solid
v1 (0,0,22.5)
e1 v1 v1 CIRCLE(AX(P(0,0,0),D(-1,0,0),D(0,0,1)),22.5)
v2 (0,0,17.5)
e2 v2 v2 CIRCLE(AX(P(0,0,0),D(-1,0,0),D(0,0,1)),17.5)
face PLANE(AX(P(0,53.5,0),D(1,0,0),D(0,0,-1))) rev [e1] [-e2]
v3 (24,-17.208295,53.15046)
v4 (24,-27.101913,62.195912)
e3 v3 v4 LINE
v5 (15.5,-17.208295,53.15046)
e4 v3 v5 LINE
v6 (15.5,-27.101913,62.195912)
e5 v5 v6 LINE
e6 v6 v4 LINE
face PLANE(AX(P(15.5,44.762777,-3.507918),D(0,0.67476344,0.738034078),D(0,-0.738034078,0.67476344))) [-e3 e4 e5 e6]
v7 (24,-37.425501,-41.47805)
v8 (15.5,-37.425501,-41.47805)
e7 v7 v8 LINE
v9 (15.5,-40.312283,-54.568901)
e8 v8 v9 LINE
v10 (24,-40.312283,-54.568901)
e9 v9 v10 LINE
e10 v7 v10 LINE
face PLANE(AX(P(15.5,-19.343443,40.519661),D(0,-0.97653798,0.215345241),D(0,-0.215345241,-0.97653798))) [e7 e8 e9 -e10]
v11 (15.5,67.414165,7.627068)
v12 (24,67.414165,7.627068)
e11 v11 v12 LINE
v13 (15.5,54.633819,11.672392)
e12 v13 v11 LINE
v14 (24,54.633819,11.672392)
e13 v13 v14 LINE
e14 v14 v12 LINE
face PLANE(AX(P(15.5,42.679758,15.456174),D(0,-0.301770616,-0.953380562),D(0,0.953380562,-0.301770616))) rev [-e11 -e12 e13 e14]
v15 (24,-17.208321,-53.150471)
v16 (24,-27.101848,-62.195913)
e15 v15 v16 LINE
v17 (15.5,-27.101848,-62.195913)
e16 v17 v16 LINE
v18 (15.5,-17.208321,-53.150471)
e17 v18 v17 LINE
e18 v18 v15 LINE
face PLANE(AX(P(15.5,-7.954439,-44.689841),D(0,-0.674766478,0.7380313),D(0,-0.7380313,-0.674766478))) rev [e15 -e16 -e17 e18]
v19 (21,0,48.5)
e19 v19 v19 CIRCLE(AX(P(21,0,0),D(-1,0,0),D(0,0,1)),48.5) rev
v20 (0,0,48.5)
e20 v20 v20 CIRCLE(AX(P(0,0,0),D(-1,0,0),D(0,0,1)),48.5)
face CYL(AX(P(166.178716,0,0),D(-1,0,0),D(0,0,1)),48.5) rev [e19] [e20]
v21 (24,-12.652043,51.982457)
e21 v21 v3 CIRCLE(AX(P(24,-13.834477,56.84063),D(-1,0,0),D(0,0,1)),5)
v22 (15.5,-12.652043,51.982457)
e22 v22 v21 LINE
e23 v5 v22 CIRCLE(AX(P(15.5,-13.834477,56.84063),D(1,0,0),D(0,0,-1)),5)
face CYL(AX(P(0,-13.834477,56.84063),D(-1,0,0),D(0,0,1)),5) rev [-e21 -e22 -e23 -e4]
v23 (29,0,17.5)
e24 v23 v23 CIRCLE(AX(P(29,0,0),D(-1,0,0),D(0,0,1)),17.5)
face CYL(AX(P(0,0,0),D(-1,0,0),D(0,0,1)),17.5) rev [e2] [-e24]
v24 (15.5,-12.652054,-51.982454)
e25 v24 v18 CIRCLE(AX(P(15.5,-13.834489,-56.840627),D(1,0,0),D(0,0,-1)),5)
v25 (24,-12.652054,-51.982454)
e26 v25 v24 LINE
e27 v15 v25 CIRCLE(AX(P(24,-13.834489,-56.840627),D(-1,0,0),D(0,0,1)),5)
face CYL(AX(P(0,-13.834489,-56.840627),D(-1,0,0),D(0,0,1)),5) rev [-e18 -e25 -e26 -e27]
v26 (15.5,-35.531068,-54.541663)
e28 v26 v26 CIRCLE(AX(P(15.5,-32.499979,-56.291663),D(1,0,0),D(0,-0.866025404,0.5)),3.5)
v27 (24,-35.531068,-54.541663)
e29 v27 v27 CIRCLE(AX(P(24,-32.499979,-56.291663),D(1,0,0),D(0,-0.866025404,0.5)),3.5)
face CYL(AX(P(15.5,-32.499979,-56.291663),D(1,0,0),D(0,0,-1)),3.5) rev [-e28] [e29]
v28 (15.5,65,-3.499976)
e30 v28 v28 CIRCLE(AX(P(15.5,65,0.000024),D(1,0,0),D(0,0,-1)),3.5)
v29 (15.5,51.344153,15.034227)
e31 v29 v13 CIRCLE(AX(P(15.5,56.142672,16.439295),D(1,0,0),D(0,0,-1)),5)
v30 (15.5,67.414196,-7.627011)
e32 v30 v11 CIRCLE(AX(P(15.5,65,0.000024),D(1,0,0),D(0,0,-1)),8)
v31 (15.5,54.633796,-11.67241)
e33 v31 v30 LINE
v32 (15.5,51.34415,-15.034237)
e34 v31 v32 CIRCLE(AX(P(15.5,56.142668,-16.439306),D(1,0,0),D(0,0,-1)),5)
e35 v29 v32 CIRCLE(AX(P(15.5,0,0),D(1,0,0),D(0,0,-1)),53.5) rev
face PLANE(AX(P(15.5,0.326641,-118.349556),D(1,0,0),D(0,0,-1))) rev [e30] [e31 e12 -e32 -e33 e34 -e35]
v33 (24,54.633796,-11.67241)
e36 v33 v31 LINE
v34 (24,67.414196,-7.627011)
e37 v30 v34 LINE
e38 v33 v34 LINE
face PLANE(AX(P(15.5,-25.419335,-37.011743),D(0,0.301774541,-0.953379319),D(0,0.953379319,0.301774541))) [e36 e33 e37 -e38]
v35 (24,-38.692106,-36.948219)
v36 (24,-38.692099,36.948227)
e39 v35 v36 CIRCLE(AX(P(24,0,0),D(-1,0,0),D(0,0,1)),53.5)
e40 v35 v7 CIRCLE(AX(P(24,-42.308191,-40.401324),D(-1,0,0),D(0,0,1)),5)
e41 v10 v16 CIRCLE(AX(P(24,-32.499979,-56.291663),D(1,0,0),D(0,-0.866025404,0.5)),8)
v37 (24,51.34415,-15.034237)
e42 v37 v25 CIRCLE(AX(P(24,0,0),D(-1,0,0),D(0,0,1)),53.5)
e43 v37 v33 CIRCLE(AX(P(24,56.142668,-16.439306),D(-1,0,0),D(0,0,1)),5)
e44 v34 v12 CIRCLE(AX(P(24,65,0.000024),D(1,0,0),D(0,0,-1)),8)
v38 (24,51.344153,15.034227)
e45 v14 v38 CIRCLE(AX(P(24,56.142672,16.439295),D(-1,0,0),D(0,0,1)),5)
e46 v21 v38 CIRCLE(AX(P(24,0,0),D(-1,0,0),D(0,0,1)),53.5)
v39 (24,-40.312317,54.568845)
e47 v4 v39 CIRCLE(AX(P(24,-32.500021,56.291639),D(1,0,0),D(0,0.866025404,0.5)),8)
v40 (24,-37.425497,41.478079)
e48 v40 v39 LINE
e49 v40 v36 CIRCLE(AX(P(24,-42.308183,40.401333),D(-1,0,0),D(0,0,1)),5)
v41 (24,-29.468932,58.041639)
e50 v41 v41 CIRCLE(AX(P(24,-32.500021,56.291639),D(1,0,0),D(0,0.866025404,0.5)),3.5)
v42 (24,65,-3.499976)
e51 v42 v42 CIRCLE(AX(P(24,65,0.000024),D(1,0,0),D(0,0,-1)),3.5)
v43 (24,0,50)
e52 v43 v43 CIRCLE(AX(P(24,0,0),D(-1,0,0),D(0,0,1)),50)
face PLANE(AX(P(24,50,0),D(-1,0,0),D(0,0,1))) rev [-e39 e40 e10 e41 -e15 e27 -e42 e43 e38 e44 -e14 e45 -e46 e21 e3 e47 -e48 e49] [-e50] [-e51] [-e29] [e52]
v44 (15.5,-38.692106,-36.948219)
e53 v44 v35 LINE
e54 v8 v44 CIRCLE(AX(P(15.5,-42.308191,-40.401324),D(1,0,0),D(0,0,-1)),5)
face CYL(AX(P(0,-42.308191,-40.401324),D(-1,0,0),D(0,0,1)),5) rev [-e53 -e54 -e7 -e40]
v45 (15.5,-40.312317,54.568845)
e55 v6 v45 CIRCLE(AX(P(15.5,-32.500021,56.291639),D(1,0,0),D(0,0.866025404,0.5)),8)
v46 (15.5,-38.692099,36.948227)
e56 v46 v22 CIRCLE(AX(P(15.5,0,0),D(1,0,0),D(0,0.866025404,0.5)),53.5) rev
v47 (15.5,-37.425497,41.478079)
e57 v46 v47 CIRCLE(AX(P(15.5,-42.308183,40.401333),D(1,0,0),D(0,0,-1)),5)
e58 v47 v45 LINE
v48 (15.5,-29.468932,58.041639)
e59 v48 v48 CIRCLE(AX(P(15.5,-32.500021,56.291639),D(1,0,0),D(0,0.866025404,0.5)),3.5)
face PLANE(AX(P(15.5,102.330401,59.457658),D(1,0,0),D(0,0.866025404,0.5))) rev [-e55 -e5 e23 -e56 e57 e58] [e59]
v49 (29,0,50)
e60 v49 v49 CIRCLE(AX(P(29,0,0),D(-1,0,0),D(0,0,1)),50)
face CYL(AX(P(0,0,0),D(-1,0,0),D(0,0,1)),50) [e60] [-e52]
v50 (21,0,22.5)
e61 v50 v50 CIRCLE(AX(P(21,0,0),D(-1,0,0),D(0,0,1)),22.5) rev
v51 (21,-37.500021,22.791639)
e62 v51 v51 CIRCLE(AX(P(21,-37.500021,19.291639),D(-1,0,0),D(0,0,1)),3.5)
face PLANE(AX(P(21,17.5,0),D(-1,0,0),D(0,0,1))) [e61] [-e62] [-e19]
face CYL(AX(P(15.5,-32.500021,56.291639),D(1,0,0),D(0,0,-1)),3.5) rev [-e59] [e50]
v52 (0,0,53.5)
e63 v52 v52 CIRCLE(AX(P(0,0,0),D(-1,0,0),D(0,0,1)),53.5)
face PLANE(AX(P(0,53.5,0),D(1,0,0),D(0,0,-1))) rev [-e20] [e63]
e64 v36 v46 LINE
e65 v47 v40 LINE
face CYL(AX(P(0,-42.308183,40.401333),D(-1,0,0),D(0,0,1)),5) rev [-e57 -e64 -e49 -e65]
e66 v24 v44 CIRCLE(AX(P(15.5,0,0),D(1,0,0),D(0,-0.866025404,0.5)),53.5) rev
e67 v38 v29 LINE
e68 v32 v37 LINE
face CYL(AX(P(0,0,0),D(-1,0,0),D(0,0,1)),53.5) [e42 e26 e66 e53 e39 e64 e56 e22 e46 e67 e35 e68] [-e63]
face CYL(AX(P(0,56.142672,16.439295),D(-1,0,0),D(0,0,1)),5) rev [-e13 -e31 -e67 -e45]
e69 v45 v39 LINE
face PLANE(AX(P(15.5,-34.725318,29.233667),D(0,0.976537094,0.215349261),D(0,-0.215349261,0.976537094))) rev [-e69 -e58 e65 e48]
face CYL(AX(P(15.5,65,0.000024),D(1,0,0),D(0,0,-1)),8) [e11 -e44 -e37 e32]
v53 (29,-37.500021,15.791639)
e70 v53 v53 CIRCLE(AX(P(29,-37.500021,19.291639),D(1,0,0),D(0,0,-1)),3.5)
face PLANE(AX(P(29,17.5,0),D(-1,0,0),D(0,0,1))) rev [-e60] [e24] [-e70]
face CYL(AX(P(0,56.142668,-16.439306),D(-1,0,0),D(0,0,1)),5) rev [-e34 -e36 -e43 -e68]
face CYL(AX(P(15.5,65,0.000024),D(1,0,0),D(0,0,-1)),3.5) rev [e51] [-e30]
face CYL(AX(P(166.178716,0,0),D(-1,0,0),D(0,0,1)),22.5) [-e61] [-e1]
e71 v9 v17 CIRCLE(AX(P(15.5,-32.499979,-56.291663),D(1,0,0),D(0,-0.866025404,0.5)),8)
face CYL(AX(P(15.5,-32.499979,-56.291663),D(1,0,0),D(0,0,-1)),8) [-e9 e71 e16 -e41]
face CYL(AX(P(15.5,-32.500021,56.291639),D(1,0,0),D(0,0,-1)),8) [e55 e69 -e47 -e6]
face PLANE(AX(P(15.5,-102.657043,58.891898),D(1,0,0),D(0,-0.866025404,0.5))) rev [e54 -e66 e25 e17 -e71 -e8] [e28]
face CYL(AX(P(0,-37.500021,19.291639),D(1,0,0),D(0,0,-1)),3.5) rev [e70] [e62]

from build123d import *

# Parameters (mm, degrees)
EXTRUS_O1_START          = -8.5
EXTRUS_O1_OUTLINE_R      = 3.5
EXTRUS_O1_DEPTH          = 8.5
FILETE1_R                = 5
CIRPATTERN1_COUNT        = 3
FILETE1_OF_CIRPATTERN1_R = 5
ESBO_O3_R                = 48.5
ESBO_O3_R_2              = 22.5
CORTE_EXTRUS_O1_DEPTH    = 21
ESBO_O4_R                = 3.5
CORTE_EXTRUS_O2_DEPTH    = 102.505753245


# Read off the part's stored shape, not the designer's step: Extrusão1
with BuildPart() as part:
    # Esboço1 → Revolução1 (revolve)
    with BuildSketch(Plane.XY, mode=Mode.PRIVATE) as revolu_o1_sk:
        Polygon((0, 17.5), (29, 17.5), (29, 50), (24, 50), (24, 53.5), (0, 53.5), align=None)
    revolve(revolu_o1_sk.sketch.rotate(Axis((0, 0, 0), (1, 0, 0)), 90), axis=Axis((0, 0, 0), (1, 0, 0)))

    # Extrusão1 outline → Extrusão1 (add)
    with BuildSketch(Plane(origin=(24, 0, 0), x_dir=(0, 0, -1), z_dir=(1, 0, 0)).offset(EXTRUS_O1_START)):
        with BuildLine():
            Line((-7.627068165, 67.414164927), (-12.499978821, 52.019232304))
            ThreePointArc((-12.499978821, 52.019232304), (1.2458e-05, 53.5), (12.500003048, 52.019226482))
            Line((12.500003048, 52.019226482), (7.627010883, 67.414196325))
            ThreePointArc((7.627010883, 67.414196325), (-4.0138e-05, 73), (-7.627068165, 67.414164927))
        make_face()
        with Locations((-2.3672e-05, 65)):
            Circle(EXTRUS_O1_OUTLINE_R, mode=Mode.SUBTRACT)
    extrus_o1 = extrude(amount=EXTRUS_O1_DEPTH)

    # Filete1
    filete1_edges = [part.edges().sort_by_distance(p)[0] for p in [
        (19.75, 52.019232304, 12.499978821),
        (19.75, 52.019226482, -12.500003048),
    ]]
    fillet(filete1_edges, radius=FILETE1_R)

    # CirPattern1: Extrusão1 ×3 about axis
    cirpattern1_axis = Axis((0, 0, 0), (1, 0, 0))
    for i in range(1, CIRPATTERN1_COUNT):
        add(extrus_o1.rotate(cirpattern1_axis, i * 360 / CIRPATTERN1_COUNT))

    # Filete1 of CirPattern1
    filete1_of_cirpattern1_edges = [part.edges().sort_by_distance(p)[0] for p in [
        (19.75, -36.834915358, 38.79998725),
        (19.75, -15.184293054, 51.299973143),
        (19.75, -15.184316946, -51.299966071),
        (19.75, -36.834933428, -38.799970095),
    ]]
    fillet(filete1_of_cirpattern1_edges, radius=FILETE1_OF_CIRPATTERN1_R)

    # Esboço3 → Corte-extrusão1 (cut)
    with BuildSketch(Plane.ZY):
        Circle(ESBO_O3_R)
        Circle(ESBO_O3_R_2, mode=Mode.SUBTRACT)
    extrude(amount=-CORTE_EXTRUS_O1_DEPTH, mode=Mode.SUBTRACT)

    # Esboço4 → Corte-extrusão2 (cut, through all)
    with BuildSketch(Plane(origin=(29, 0, 0), x_dir=(0, 0, -1), z_dir=(1, 0, 0))):
        with Locations((-19.29163941, -37.5000205)):
            Circle(ESBO_O4_R)
    extrude(amount=-CORTE_EXTRUS_O2_DEPTH, mode=Mode.SUBTRACT)


solid = part.part
